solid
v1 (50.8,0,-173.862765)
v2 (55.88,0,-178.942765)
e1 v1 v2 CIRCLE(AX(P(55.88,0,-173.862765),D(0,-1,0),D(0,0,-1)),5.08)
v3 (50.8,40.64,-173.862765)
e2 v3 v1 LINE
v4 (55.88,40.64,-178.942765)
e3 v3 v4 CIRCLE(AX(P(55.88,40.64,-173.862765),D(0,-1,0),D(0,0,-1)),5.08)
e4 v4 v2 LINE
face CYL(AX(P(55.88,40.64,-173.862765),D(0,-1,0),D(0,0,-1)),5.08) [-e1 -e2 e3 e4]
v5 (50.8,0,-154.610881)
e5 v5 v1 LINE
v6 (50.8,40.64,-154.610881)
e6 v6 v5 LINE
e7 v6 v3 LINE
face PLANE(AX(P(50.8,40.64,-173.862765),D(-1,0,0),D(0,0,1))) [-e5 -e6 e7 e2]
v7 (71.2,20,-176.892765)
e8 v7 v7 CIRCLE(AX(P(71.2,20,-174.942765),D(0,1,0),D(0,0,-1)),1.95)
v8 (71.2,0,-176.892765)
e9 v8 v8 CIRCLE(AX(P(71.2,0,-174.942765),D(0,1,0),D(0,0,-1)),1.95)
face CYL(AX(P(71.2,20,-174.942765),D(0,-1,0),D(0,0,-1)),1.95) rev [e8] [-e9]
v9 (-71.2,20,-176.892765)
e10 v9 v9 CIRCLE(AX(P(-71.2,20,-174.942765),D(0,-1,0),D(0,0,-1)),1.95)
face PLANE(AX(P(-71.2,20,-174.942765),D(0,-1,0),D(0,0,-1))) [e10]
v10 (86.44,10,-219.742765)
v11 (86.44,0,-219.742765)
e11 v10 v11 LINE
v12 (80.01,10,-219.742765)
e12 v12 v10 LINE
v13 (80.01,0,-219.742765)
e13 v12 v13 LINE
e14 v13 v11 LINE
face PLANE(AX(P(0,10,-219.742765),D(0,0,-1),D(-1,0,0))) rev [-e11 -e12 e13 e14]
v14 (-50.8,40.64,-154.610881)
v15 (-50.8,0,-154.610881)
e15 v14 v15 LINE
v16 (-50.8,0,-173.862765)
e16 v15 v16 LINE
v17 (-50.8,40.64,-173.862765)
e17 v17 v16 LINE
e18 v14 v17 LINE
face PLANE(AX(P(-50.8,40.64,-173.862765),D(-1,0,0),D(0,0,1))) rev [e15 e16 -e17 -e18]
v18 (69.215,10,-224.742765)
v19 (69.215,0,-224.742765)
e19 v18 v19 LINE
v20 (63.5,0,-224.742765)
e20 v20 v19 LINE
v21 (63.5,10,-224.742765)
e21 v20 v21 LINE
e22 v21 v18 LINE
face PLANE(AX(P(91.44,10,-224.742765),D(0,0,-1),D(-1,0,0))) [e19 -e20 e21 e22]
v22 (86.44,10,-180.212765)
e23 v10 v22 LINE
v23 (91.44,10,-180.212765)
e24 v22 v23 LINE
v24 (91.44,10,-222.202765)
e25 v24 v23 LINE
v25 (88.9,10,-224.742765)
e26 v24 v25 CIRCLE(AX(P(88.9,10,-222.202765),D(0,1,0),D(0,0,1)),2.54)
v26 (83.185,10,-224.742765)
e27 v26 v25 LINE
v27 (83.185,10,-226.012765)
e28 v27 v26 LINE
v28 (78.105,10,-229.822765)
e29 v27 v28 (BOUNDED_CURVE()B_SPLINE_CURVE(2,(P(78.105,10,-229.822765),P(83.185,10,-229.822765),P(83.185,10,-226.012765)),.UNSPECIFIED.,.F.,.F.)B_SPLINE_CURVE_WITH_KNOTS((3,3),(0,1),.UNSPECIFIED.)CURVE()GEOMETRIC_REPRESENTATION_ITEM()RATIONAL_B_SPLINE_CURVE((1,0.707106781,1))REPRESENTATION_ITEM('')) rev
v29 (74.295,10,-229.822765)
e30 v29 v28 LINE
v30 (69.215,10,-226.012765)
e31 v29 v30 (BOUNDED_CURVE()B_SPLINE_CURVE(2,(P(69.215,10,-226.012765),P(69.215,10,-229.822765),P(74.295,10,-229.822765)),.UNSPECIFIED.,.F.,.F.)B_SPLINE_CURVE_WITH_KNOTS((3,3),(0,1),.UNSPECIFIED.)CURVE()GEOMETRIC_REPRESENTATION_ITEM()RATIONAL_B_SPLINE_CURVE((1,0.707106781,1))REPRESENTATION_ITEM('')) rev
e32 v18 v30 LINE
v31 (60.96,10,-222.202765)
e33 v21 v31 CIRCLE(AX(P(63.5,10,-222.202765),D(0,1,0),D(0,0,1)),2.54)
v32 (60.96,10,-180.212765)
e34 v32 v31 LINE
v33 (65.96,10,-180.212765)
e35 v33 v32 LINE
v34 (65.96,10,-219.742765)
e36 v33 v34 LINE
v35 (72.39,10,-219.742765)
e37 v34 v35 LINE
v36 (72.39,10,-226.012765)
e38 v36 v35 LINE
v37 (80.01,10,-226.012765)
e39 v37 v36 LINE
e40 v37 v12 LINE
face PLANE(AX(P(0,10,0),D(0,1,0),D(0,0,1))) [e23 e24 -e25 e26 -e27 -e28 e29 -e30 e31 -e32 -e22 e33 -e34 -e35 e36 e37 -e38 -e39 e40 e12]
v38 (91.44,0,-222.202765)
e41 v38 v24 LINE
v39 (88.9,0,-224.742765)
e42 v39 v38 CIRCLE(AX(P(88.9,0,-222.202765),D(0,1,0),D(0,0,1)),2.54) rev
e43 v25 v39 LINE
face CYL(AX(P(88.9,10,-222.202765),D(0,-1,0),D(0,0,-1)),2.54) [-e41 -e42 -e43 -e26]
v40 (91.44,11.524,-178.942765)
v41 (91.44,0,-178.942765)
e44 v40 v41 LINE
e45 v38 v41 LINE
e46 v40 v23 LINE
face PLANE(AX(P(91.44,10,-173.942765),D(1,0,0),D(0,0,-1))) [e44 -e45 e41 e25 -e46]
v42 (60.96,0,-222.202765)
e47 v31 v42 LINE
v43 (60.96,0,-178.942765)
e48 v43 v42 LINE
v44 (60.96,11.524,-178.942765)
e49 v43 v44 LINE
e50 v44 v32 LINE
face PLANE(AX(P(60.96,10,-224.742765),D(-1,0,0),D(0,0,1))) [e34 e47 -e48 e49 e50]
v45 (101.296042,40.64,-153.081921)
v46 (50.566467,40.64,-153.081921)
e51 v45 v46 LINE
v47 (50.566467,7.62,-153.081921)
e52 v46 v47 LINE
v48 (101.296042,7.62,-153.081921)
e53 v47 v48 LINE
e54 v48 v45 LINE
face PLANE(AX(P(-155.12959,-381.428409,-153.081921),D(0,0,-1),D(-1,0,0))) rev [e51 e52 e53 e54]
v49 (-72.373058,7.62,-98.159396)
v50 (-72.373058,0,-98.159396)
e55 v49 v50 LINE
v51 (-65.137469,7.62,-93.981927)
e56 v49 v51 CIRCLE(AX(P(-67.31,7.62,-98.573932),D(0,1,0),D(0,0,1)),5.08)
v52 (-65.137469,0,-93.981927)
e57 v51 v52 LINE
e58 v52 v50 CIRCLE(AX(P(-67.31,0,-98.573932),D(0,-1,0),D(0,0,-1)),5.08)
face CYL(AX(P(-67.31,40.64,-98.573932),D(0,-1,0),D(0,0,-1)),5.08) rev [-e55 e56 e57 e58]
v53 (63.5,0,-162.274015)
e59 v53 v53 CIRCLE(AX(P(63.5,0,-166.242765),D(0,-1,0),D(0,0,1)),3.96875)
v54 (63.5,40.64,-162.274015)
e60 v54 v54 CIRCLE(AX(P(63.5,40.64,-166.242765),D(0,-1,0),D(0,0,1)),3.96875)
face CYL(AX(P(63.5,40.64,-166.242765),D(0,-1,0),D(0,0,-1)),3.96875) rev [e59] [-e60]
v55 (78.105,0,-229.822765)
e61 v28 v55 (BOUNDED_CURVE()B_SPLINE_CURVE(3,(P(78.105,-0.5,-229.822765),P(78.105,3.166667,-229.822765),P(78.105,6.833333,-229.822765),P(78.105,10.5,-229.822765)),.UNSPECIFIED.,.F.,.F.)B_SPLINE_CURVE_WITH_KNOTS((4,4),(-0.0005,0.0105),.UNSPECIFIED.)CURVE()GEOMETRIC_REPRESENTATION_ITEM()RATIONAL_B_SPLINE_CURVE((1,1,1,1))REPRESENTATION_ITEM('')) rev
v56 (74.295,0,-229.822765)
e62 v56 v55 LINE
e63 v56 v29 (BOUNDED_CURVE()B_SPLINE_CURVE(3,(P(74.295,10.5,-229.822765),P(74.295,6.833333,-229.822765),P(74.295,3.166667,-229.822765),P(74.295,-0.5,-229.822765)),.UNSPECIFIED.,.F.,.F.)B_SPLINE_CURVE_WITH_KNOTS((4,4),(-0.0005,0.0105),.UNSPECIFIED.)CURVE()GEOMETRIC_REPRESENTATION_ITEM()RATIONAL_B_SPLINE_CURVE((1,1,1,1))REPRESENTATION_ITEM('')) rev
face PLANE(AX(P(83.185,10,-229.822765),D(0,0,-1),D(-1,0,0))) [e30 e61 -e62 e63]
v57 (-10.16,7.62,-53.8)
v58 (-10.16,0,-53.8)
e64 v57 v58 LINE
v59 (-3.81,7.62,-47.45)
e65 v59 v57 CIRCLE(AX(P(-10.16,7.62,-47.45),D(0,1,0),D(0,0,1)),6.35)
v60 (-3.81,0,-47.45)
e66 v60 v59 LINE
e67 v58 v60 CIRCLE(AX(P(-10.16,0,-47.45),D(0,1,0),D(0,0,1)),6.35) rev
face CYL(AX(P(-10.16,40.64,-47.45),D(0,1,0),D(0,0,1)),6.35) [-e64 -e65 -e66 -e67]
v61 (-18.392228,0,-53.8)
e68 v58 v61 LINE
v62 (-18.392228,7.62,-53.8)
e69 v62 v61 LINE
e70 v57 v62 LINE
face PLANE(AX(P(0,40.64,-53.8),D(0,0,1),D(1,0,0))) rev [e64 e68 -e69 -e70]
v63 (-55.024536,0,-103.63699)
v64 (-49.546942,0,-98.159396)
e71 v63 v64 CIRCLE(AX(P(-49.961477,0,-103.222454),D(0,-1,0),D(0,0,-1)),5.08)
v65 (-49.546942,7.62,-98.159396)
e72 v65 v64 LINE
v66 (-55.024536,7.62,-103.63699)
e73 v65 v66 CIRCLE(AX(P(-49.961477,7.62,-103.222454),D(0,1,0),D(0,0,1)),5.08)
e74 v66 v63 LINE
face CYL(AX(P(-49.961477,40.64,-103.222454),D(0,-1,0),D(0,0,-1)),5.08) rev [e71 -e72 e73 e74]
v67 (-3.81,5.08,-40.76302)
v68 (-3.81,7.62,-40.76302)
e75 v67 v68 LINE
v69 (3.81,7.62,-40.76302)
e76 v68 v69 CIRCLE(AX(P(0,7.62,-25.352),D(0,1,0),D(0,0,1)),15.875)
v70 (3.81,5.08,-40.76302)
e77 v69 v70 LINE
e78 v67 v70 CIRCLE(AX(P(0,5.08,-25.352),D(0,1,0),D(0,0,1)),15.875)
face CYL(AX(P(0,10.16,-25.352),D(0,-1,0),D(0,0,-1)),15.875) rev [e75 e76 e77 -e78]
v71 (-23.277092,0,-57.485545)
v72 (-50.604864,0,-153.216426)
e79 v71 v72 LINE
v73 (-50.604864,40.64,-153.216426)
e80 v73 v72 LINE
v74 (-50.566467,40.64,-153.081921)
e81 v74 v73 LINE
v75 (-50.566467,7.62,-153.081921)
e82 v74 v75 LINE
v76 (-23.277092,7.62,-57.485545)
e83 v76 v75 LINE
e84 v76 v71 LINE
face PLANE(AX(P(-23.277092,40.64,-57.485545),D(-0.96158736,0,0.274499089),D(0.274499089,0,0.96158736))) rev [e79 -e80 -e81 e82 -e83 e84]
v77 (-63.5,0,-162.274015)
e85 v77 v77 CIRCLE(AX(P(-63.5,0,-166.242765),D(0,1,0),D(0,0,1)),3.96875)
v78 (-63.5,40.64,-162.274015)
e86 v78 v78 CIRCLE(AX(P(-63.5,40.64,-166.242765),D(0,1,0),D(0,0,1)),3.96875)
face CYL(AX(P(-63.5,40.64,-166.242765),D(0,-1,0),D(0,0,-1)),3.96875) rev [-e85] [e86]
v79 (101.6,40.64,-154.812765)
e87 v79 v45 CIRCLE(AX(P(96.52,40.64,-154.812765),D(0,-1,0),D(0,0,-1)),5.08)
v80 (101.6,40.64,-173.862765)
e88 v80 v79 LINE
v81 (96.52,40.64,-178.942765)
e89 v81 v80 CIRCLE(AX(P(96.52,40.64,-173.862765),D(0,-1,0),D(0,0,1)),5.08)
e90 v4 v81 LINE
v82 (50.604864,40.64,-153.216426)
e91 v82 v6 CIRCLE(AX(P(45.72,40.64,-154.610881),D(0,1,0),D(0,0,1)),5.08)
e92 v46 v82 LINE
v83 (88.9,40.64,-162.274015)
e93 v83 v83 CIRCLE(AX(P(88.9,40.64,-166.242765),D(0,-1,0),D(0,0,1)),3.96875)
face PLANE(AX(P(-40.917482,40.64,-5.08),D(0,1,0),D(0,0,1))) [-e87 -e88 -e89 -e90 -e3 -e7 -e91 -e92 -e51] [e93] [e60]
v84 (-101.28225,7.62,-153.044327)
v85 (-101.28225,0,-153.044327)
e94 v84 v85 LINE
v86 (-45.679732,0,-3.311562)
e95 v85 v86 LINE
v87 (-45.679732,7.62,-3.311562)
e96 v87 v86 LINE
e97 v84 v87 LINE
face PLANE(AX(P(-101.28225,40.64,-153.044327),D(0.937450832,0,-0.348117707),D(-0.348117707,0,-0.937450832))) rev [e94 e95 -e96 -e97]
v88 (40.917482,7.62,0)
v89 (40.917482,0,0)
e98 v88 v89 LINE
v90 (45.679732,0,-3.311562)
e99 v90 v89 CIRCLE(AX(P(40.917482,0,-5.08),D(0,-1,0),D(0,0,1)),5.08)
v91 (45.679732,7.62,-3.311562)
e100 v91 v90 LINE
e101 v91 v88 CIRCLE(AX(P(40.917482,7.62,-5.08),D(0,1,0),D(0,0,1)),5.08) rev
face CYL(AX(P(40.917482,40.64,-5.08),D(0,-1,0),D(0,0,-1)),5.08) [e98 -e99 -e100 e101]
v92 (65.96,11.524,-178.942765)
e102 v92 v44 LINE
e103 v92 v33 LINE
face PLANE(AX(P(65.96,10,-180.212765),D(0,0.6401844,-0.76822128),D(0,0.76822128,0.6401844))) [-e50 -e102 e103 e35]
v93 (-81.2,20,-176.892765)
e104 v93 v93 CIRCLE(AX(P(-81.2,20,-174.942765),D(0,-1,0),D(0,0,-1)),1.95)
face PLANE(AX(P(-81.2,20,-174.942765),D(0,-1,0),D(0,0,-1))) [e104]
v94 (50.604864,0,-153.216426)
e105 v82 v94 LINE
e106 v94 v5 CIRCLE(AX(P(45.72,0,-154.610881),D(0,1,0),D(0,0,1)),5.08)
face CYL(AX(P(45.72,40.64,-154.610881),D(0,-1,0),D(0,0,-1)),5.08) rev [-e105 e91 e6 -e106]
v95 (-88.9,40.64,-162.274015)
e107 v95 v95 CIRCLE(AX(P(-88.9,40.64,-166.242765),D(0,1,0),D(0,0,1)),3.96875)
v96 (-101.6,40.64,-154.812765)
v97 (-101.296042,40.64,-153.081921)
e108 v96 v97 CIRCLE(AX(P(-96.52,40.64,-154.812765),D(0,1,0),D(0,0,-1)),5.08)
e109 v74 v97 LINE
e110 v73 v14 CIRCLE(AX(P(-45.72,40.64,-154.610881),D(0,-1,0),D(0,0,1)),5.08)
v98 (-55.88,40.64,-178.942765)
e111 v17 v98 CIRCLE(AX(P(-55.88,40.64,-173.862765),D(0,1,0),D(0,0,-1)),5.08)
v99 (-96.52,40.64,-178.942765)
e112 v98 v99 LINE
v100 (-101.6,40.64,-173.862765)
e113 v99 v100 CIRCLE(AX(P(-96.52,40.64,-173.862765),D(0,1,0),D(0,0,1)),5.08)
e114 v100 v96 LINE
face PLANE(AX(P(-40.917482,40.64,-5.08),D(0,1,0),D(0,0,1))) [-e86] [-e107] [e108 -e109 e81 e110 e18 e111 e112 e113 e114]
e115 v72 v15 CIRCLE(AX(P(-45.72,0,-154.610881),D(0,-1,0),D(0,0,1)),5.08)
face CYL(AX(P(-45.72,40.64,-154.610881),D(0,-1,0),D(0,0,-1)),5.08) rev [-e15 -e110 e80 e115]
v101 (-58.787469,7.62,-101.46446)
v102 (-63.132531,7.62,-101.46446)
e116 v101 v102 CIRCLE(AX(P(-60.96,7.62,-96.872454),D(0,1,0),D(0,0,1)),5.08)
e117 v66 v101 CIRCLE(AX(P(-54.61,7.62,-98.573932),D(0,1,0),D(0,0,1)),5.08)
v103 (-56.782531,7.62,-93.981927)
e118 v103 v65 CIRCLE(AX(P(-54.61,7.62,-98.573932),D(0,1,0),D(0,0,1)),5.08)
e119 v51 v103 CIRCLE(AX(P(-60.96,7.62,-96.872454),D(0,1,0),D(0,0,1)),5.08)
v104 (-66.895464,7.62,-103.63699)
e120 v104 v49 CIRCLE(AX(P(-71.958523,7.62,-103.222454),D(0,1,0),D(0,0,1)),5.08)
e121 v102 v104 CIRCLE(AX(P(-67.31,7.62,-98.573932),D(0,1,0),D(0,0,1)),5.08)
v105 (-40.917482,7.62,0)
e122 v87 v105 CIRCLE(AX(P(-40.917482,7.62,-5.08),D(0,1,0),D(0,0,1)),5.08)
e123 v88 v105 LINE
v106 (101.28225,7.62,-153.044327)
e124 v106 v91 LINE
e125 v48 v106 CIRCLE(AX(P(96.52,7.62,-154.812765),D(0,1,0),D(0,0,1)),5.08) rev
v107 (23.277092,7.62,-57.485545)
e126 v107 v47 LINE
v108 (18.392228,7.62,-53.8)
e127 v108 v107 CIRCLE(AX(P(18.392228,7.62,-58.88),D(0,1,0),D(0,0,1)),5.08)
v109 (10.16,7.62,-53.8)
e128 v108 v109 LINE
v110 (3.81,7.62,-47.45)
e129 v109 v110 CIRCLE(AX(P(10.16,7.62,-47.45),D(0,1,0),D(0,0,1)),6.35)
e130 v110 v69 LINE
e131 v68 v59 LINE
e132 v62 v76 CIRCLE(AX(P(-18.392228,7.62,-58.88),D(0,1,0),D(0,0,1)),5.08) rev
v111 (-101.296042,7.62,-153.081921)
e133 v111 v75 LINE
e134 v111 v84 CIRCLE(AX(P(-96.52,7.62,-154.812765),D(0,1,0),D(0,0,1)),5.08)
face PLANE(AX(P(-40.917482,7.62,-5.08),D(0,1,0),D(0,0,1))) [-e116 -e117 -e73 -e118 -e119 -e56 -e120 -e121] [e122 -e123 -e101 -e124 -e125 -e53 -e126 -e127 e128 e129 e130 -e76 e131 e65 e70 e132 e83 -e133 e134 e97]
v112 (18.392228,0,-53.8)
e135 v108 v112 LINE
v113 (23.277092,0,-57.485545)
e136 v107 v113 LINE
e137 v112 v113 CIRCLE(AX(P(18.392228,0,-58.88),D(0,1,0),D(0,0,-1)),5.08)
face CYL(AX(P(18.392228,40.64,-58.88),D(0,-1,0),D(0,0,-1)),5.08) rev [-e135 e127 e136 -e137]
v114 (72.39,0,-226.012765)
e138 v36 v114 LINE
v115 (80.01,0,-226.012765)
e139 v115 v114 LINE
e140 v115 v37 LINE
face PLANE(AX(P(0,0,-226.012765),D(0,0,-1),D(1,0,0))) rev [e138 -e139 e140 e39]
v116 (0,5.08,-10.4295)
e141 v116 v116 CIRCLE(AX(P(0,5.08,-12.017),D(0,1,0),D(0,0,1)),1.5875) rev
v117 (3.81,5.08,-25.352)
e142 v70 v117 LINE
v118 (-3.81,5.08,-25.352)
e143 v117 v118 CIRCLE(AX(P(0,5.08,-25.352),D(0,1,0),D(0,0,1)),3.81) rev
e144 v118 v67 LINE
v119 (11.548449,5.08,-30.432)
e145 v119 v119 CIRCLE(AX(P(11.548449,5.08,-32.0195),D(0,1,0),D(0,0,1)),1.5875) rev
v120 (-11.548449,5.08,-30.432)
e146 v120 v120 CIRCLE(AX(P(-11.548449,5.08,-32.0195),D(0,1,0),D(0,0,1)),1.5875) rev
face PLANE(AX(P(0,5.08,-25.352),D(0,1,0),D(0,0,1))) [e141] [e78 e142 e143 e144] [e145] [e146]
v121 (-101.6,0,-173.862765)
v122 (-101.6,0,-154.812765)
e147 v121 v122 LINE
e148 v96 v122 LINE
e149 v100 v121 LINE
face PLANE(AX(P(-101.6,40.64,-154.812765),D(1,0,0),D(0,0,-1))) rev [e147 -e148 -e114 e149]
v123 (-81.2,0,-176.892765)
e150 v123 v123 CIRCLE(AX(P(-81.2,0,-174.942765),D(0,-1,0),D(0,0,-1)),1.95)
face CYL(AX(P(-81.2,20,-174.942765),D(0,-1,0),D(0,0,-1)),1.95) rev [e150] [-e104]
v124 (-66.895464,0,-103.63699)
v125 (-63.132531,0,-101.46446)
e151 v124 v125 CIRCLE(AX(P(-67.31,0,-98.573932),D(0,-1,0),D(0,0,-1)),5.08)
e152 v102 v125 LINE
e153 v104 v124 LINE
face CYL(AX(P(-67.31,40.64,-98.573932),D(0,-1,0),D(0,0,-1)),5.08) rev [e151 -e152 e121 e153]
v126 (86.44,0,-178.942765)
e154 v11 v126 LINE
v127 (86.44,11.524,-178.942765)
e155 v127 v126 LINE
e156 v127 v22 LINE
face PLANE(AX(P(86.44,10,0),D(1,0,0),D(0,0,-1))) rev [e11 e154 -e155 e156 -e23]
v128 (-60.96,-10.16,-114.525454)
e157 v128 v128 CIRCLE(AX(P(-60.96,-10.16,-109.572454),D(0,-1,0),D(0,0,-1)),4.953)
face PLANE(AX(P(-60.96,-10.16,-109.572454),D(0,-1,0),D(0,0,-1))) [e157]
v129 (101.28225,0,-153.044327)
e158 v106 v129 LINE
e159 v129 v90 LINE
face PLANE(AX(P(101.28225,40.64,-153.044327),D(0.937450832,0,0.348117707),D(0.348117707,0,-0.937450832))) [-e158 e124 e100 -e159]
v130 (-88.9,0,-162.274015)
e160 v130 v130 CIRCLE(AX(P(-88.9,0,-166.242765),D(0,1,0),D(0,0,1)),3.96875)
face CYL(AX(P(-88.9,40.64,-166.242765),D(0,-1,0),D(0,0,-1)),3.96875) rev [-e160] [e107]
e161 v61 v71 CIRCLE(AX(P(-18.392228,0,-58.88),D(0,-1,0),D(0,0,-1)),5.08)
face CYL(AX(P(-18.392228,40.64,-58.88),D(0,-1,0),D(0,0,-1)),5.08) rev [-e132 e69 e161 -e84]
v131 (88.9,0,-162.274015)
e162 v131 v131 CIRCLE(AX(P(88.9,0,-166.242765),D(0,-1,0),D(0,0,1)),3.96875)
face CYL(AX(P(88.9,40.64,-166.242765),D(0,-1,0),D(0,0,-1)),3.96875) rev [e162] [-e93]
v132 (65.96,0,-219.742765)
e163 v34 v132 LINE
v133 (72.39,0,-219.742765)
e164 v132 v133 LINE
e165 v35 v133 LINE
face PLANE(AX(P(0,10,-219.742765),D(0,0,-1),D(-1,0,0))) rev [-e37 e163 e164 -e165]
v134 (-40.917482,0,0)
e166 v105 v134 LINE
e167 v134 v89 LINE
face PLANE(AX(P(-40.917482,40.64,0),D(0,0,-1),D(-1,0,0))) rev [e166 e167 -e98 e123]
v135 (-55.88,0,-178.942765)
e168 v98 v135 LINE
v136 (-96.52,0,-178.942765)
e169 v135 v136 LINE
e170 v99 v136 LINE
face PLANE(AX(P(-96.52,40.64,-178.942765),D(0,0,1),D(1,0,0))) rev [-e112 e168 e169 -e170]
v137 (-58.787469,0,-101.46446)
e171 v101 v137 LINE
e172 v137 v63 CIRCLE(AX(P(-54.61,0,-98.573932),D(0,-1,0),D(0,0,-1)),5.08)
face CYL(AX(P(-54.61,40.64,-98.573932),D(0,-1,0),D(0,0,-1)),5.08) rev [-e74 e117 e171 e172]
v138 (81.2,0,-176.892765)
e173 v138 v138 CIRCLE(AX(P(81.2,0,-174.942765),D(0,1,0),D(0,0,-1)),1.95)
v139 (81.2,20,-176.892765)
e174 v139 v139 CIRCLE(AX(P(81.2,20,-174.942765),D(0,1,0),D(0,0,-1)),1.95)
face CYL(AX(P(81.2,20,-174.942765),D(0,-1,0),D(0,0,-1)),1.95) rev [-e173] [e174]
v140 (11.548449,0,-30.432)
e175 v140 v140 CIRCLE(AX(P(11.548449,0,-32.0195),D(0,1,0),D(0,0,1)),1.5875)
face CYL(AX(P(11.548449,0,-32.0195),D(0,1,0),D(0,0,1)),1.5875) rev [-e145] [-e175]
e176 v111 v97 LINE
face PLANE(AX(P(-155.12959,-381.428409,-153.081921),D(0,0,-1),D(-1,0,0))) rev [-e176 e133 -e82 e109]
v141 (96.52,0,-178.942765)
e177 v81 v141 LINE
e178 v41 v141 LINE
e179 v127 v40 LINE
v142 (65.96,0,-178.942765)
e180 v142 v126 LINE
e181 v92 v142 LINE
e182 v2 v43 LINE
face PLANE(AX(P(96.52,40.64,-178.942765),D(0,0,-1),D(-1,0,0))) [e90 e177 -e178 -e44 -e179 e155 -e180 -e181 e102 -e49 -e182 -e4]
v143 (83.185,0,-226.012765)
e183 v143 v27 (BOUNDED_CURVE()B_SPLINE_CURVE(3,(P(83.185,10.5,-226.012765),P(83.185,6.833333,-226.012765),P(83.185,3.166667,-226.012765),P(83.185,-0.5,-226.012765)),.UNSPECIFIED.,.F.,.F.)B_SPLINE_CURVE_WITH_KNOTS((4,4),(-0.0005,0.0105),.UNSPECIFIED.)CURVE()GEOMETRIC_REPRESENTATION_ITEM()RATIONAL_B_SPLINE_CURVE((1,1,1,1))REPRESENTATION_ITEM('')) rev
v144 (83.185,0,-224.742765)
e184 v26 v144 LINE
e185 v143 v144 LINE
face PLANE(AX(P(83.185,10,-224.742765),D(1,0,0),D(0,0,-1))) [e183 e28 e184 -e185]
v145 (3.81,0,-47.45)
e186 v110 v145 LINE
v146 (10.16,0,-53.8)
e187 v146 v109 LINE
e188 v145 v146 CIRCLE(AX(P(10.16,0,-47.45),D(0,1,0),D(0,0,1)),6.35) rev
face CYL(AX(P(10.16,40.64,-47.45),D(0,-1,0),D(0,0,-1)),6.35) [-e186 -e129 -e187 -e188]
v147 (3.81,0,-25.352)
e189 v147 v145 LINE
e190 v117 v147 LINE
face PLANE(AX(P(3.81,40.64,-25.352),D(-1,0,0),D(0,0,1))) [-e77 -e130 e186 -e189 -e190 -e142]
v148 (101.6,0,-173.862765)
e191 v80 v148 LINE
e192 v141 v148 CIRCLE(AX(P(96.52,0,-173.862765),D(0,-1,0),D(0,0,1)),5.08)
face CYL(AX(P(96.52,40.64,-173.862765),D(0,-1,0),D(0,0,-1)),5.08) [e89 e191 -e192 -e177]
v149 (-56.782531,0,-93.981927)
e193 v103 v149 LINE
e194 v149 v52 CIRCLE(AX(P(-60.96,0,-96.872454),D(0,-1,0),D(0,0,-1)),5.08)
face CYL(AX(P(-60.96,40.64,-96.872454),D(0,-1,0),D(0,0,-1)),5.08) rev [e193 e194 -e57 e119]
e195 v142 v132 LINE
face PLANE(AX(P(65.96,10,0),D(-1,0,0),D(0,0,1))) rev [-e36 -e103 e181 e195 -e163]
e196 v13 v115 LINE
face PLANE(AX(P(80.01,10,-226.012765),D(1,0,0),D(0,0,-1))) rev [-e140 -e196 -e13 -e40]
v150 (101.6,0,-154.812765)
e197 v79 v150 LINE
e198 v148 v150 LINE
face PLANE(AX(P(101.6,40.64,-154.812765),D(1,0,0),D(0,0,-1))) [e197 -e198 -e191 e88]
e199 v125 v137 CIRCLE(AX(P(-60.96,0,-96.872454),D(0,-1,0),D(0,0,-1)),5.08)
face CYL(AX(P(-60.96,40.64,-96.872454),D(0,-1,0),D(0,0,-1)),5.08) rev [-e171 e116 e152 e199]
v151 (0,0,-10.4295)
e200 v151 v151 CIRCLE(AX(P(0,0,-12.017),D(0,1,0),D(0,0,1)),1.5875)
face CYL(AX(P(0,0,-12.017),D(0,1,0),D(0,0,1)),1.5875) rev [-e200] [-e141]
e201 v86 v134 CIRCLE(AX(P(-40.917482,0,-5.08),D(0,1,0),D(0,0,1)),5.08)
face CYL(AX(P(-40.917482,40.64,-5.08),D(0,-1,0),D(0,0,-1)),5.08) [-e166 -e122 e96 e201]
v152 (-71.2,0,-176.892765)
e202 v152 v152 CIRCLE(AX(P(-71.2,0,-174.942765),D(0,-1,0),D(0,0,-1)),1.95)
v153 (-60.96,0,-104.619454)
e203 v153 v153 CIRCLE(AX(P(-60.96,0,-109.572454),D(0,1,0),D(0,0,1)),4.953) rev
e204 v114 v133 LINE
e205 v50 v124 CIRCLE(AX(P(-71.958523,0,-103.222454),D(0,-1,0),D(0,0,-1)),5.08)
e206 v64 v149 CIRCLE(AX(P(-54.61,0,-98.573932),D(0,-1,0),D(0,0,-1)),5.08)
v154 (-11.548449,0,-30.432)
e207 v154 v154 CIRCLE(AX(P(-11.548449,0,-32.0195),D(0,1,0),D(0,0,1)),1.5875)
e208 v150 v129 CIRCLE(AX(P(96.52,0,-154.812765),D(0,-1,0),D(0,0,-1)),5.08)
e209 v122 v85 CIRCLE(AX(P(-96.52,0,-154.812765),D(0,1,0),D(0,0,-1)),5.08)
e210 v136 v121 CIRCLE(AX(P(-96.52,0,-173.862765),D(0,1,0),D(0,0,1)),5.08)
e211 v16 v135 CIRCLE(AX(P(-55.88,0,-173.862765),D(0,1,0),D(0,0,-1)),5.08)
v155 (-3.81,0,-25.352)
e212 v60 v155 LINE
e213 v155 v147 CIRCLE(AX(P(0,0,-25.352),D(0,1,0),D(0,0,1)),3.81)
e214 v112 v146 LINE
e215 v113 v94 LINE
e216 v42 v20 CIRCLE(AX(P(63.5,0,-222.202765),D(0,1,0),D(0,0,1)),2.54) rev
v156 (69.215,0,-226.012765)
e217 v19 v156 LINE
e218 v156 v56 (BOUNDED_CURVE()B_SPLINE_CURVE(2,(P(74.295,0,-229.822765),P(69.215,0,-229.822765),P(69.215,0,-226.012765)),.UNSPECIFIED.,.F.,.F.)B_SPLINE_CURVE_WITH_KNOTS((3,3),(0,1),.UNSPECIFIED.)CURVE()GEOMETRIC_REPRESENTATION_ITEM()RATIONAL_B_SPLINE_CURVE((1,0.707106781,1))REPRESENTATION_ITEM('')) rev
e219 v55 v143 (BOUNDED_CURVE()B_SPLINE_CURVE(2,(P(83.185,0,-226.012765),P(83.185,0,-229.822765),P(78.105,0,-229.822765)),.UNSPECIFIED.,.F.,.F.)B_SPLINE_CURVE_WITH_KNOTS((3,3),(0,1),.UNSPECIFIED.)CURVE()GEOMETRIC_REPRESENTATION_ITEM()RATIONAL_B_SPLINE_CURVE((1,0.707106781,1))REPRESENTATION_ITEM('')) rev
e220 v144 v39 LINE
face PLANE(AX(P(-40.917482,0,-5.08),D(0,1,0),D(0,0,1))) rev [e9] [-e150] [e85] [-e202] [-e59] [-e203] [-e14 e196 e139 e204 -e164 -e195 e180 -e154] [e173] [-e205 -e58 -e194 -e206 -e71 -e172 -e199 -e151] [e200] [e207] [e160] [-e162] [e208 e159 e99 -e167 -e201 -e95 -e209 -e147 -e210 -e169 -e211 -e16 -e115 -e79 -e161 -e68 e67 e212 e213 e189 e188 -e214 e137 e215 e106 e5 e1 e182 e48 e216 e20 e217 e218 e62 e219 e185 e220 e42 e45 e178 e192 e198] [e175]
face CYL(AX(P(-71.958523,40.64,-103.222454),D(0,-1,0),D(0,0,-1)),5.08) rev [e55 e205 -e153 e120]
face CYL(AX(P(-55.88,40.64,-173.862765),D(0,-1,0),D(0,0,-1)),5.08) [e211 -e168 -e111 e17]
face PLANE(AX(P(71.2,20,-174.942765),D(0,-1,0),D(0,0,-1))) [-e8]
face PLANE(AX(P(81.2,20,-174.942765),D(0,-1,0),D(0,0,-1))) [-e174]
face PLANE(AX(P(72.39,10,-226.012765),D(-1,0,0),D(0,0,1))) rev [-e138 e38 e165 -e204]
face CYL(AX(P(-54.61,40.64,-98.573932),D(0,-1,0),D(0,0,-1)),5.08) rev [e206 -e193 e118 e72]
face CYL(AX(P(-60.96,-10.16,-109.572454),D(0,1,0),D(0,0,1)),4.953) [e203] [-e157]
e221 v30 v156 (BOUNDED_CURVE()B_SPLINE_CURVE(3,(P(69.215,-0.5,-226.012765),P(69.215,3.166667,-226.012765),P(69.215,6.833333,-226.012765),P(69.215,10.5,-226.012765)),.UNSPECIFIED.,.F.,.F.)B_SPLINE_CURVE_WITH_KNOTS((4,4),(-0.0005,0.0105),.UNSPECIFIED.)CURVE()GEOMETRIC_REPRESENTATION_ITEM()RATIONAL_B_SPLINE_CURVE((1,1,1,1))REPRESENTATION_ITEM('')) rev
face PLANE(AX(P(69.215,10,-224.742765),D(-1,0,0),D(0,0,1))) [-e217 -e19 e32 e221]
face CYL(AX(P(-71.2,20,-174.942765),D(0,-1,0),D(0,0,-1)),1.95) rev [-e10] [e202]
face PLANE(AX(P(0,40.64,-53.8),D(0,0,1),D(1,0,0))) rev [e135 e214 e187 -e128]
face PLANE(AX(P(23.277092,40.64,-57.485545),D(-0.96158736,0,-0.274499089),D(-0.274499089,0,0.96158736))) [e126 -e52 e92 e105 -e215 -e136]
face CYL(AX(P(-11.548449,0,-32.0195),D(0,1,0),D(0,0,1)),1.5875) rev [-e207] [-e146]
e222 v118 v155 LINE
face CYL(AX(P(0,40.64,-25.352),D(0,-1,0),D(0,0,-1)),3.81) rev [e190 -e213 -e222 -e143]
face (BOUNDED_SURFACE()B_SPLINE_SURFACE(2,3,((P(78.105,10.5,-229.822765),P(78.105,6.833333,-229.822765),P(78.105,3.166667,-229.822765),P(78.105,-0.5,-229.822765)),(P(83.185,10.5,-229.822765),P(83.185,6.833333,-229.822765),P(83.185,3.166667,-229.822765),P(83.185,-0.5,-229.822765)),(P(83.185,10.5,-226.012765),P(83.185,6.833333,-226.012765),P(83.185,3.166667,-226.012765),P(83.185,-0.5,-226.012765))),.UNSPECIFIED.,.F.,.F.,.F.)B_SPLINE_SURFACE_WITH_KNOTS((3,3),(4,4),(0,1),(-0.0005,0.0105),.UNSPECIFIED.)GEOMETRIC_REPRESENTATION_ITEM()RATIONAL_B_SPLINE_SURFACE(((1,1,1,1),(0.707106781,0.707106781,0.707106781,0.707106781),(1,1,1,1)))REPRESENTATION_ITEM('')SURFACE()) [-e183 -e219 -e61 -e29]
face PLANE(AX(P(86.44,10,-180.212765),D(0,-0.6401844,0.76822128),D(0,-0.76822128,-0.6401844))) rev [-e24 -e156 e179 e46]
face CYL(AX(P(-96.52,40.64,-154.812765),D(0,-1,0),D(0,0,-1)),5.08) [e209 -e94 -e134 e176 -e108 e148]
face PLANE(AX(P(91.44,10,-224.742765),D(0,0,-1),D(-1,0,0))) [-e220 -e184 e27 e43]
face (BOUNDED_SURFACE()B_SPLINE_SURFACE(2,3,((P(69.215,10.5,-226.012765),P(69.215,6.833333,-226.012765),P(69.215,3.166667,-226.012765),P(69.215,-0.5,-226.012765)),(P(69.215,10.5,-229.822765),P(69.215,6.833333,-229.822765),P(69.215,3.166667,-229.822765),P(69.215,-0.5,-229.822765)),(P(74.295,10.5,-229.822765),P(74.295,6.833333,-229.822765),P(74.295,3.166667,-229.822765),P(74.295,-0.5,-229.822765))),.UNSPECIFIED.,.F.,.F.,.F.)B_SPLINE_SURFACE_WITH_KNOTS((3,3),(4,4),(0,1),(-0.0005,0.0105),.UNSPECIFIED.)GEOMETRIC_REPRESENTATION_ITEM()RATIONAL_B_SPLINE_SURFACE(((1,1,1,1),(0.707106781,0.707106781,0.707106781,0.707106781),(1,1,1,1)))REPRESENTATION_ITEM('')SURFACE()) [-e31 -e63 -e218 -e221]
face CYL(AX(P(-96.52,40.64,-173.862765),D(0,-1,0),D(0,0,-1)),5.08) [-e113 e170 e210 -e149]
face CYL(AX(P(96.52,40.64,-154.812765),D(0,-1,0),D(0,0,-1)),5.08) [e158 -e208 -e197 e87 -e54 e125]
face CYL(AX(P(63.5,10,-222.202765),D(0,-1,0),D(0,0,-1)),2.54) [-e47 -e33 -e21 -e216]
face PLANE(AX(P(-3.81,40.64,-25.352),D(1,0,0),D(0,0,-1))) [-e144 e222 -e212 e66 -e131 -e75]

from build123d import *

# Parameters (mm, degrees)
SKETCH1_R            = 3.96875
BOSS_EXTRUDE2_DEPTH  = 40.64
SKETCH4_R            = 1.5875
CUT_EXTRUDE1_DEPTH   = 210.749095026
CUT_EXTRUDE2_START   = 5.08
SKETCH5_R            = 15.875
CUT_EXTRUDE2_DEPTH   = 5.08
SKETCH7_W            = 321.437634852
SKETCH7_H            = 153.081921076
CUT_EXTRUDE3_DEPTH   = 33.02
CUT_EXTRUDE5_DEPTH   = 210.749095026
FILLET1_R            = 6.35
FILLET2_R            = 6.35
EXTRUDE_THIN1_DEPTH  = 10
SKETCH14_R           = 1.950000064
CUT_EXTRUDE6_DEPTH   = 20
BOSS_EXTRUDE4_DEPTH  = 5
MIRROR5_COPY_1_DEPTH = 5
FILLET3_R            = 2.54
SKETCH20_W           = 13.97
SKETCH20_H           = 5.08
BOSS_EXTRUDE5_DEPTH  = 10
FILLET7_SIZE         = 3.81
FILLET7_SIZE_2       = 5.08
FILLET6_SIZE         = 3.81
FILLET6_SIZE_2       = 5.08
CUT_EXTRUDE10_START  = -5
SKETCH19_W           = 7.62
SKETCH19_H           = 10.16
CUT_EXTRUDE10_DEPTH  = 6.27
MIRROR6_OUTLINE_W    = 7.62
MIRROR6_OUTLINE_H    = 5
MIRROR6_DEPTH        = 10
MIRROR6_2_DEPTH      = 10
SKETCH21_W           = 77.087164644
SKETCH21_H           = 69.073945867
CUT_EXTRUDE11_DEPTH  = 210.74909516
SKETCH22_R           = 4.953
BOSS_EXTRUDE6_DEPTH  = 10.16
SKETCH23_R           = 5.08
CUT_EXTRUDE12_DEPTH  = 255.54404949


# Read off the part's stored shape, not the designer's step: Mirror6
with BuildPart() as part:
    # Sketch1 → Boss-Extrude2 (new body)
    with BuildSketch(Plane(origin=(0, 0, 0), x_dir=(1, 0, 0), z_dir=(0, 1, 0))):
        with BuildLine():
            Line((-96.52, 178.942765331), (-55.88, 178.942765331))
            ThreePointArc((-55.88, 178.942765331), (-52.287897552, 177.454867779), (-50.8, 173.862765331))
            Line((-50.8, 173.862765331), (-50.8, 154.610881096))
            ThreePointArc((-50.8, 154.610881096), (-50.750979429, 153.906859803), (-50.604863787, 153.216425724))
            Line((-50.604863787, 153.216425724), (-23.277092285, 57.485544628))
            ThreePointArc((-23.277092285, 57.485544628), (-21.451849938, 54.824742099), (-18.392228498, 53.8))
            Line((-18.392228498, 53.8), (0, 53.8))
            Line((0, 53.8), (0, 0))
            Line((0, 0), (-40.91748188, 0))
            ThreePointArc((-40.91748188, 0), (-43.817717665, 0.909264766), (-45.679732106, 3.31156205))
            Line((-45.679732106, 3.31156205), (-101.282250226, 153.044327381))
            ThreePointArc((-101.282250226, 153.044327381), (-101.519931557, 153.914386555), (-101.6, 154.812765331))
            Line((-101.6, 154.812765331), (-101.6, 173.862765331))
            ThreePointArc((-101.6, 173.862765331), (-100.112102448, 177.454867779), (-96.52, 178.942765331))
        make_face()
        with Locations(Location((-88.9, 166.242765331, 0), (0, 0, 270))):
            Circle(SKETCH1_R, mode=Mode.SUBTRACT)
        with Locations(Location((-63.5, 166.242765331, 0), (0, 0, 270))):
            Circle(SKETCH1_R, mode=Mode.SUBTRACT)
    boss_extrude2 = extrude(amount=BOSS_EXTRUDE2_DEPTH)

    # Mirror1: Boss-Extrude2 across plane
    add(boss_extrude2.mirror(Plane(origin=(0, 40.64, -53.8), x_dir=(0, 0, 1), z_dir=(-1, 0, 0))))

    # Sketch4 → Cut-Extrude1 (cut, through all)
    with BuildSketch(Plane(origin=(0, 40.64, 0), x_dir=(1, 0, 0), z_dir=(0, 1, 0))):
        with Locations(Location((11.548448759, 32.0195, 0), (0, 0, 270))):
            Circle(SKETCH4_R)
        with Locations(Location((0, 12.017, 0), (0, 0, 270))):
            Circle(SKETCH4_R)
        with Locations(Location((-11.548448759, 32.0195, 0), (0, 0, 270))):
            Circle(SKETCH4_R)
    extrude(amount=-CUT_EXTRUDE1_DEPTH, mode=Mode.SUBTRACT)

    # Sketch5 → Cut-Extrude2 (cut)
    with BuildSketch(Plane(origin=(0, 0, 0), x_dir=(1, 0, 0), z_dir=(0, 1, 0)).offset(CUT_EXTRUDE2_START)):
        with Locations(Location((0, 25.352, 0), (0, 0, 270))):
            Circle(SKETCH5_R)
    extrude(amount=CUT_EXTRUDE2_DEPTH, mode=Mode.SUBTRACT)

    # Sketch7 → Cut-Extrude3 (cut)
    with BuildSketch(Plane(origin=(0, 40.64, 0), x_dir=(1, 0, 0), z_dir=(0, 1, 0))):
        with Locations((5.589227859, 76.540960538)):
            Rectangle(SKETCH7_W, SKETCH7_H)
    extrude(amount=-CUT_EXTRUDE3_DEPTH, mode=Mode.SUBTRACT)

    # Sketch8 → Cut-Extrude5 (cut, through all)
    with BuildSketch(Plane(origin=(0, 0, 0), x_dir=(1, 0, 0), z_dir=(0, 1, 0))):
        with BuildLine():
            Line((-3.81, 25.352), (-3.81, 53.8))
            ThreePointArc((-3.81, 53.8), (0, 57.61), (3.81, 53.8))
            Line((3.81, 53.8), (3.81, 25.352))
            ThreePointArc((3.81, 25.352), (0, 21.542), (-3.81, 25.352))
        make_face()
    extrude(amount=CUT_EXTRUDE5_DEPTH, mode=Mode.SUBTRACT)

    # Fillet1
    fillet1_edges = [part.edges().sort_by_distance(p)[0] for p in [
        (-3.81, 3.81, -53.8),
    ]]
    fillet(fillet1_edges, radius=FILLET1_R)

    # Fillet2
    fillet2_edges = [part.edges().sort_by_distance(p)[0] for p in [
        (3.81, 3.81, -53.8),
    ]]
    fillet(fillet2_edges, radius=FILLET2_R)

    # Sketch9 → Extrude-Thin1 (add)
    with BuildSketch(Plane(origin=(0, 0, 0), x_dir=(1, 0, 0), z_dir=(0, 1, 0))):
        Polygon((-91.44, 173.942765331), (-91.44, 224.742765331), (-60.96, 224.742765331), (-60.96, 173.942765331), (-65.96, 173.942765331), (-65.96, 219.742765331), (-86.44, 219.742765331), (-86.44, 173.942765331), align=None)
    extrude_thin1 = extrude(amount=EXTRUDE_THIN1_DEPTH)

    # Sketch14 → Cut-Extrude6 (cut)
    with BuildSketch(Plane.XZ):
        with Locations(Location((-81.2, -174.942765331, 0), (0, 0, 270))):
            Circle(SKETCH14_R)
        with Locations(Location((-71.2, -174.942765331, 0), (0, 0, 270))):
            Circle(SKETCH14_R)
    cut_extrude6 = extrude(amount=-CUT_EXTRUDE6_DEPTH, mode=Mode.SUBTRACT)

    # Sketch18 → Boss-Extrude4 (add)
    with BuildSketch(Plane(origin=(-60.96, 10, -178.942765331), x_dir=(0, 0, 1), z_dir=(-1, 0, 0))):
        Polygon((-1.27, 0), (0, 1.524), (0, 0), align=None)
    boss_extrude4 = extrude(amount=BOSS_EXTRUDE4_DEPTH)

    # Mirror3: Boss-Extrude4 across plane
    add(boss_extrude4.mirror(Plane(origin=(-76.2, 0, 0), x_dir=(0, 0, 1), z_dir=(1, 0, 0))))

    # Mirror5: Extrude-Thin1, Cut-Extrude6, Boss-Extrude4 across plane
    add(extrude_thin1.mirror(Plane(origin=(0, 0, 0), x_dir=(0, 0, 1), z_dir=(1, 0, 0))))
    add(cut_extrude6.mirror(Plane(origin=(0, 0, 0), x_dir=(0, 0, 1), z_dir=(1, 0, 0))), mode=Mode.SUBTRACT)
    add(boss_extrude4.mirror(Plane(origin=(0, 0, 0), x_dir=(0, 0, 1), z_dir=(1, 0, 0))))

    # Mirror5 copy 1 sketch → Mirror5 copy 1 (add)
    with BuildSketch(Plane(origin=(91.44, 10, -178.942765331), x_dir=(0, 0, 1), z_dir=(-1, 0, 0))):
        Polygon((-1.27, 0), (0, 1.524), (0, 0), align=None)
    extrude(amount=MIRROR5_COPY_1_DEPTH)

    # Fillet3
    fillet3_edges = [part.edges().sort_by_distance(p)[0] for p in [
        (-91.44, 5, -224.742765331),
        (-60.96, 5, -224.742765331),
        (91.44, 5, -224.742765331),
        (60.96, 5, -224.742765331),
    ]]
    fillet(fillet3_edges, radius=FILLET3_R)

    # Sketch20 → Boss-Extrude5 (add)
    with BuildSketch(Plane(origin=(0, 0, 0), x_dir=(1, 0, 0), z_dir=(0, 1, 0))):
        with Locations((-76.2, 227.282765331)):
            Rectangle(SKETCH20_W, SKETCH20_H)
    extrude(amount=BOSS_EXTRUDE5_DEPTH)

    # Fillet7
    # an asymmetric fillet: 5.08, 3.81 mm, written as the material it takes off along each edge
    with BuildSketch(Plane(origin=(-83.185, -12.7, -229.822765331), x_dir=(0, 0, 1), z_dir=(0, 1, 0))) as fillet7_piece_1:
        with BuildLine():
            Bezier((FILLET7_SIZE, 0), (0, 0), (0, FILLET7_SIZE_2), weights=[1, 0.707106781, 1])
            Line((0, FILLET7_SIZE_2), (0, 0))
            Line((0, 0), (FILLET7_SIZE, 0))
        make_face()
    extrude(amount=35.4, mode=Mode.SUBTRACT)

    # Fillet6
    # an asymmetric fillet: 5.08, 3.81 mm, written as the material it takes off along each edge
    with BuildSketch(Plane(origin=(-69.215, -12.7, -229.822765331), x_dir=(0, 0, 1), z_dir=(0, 1, 0))) as fillet6_piece_1:
        with BuildLine():
            Bezier((FILLET6_SIZE, 0), (0, 0), (0, -FILLET6_SIZE_2), weights=[1, 0.707106781, 1])
            Line((0, -FILLET6_SIZE_2), (0, 0))
            Line((0, 0), (FILLET6_SIZE, 0))
        make_face()
    extrude(amount=35.4, mode=Mode.SUBTRACT)

    # Sketch19 → Cut-Extrude10 (cut)
    with BuildSketch(Plane(origin=(0, 0, -224.742765331), x_dir=(-1, 0, 0), z_dir=(0, 0, -1)).offset(CUT_EXTRUDE10_START)):
        with Locations((76.2, 4.92)):
            Rectangle(SKETCH19_W, SKETCH19_H)
    extrude(amount=CUT_EXTRUDE10_DEPTH, mode=Mode.SUBTRACT)

    # Mirror6 outline → Mirror6 (cut)
    with BuildSketch(Plane(origin=(0, 0, 0), x_dir=(1, 0, 0), z_dir=(0, 1, 0))):
        with Locations((76.2, 222.242765331)):
            Rectangle(MIRROR6_OUTLINE_W, MIRROR6_OUTLINE_H)
    extrude(amount=MIRROR6_DEPTH, mode=Mode.SUBTRACT)

    # Mirror6 2 outline → Mirror6 2 (add)
    with BuildSketch(Plane(origin=(0, 0, 0), x_dir=(1, 0, 0), z_dir=(0, 1, 0))):
        with BuildLine():
            add(Edge.make_bspline(
                [(78.105, 229.822765331), (83.185, 229.822765331), (83.185, 226.012765331)],
                knots=[0, 0, 0, 1, 1, 1], degree=2, weights=[1, 0.707106781, 1]))
            Line((78.105, 229.822765331), (74.295, 229.822765331))
            add(Edge.make_bspline(
                [(69.215, 226.012765331), (69.215, 229.822765331), (74.295, 229.822765331)],
                knots=[0, 0, 0, 1, 1, 1], degree=2, weights=[1, 0.707106781, 1]))
            Line((69.215, 226.012765331), (69.215, 224.742765331))
            Line((69.215, 224.742765331), (72.39, 224.742765331))
            Line((72.39, 224.742765331), (72.39, 226.012765331))
            Line((72.39, 226.012765331), (80.01, 226.012765331))
            Line((80.01, 226.012765331), (80.01, 224.742765331))
            Line((80.01, 224.742765331), (83.185, 224.742765331))
            Line((83.185, 224.742765331), (83.185, 226.012765331))
        make_face()
    extrude(amount=MIRROR6_2_DEPTH)

    # Sketch21 → Cut-Extrude11 (cut, through all)
    with BuildSketch(Plane(origin=(0, 0, -178.942765331), x_dir=(-1, 0, 0), z_dir=(0, 0, -1))):
        with Locations((78.752430528, 22.788762469)):
            Rectangle(SKETCH21_W, SKETCH21_H)
    extrude(amount=CUT_EXTRUDE11_DEPTH, mode=Mode.SUBTRACT)

    # Sketch22 → Boss-Extrude6 (add)
    with BuildSketch(Plane.XZ):
        with Locations(Location((-60.96, -109.572454465, 0), (0, 0, 90))):
            Circle(SKETCH22_R)
    extrude(amount=BOSS_EXTRUDE6_DEPTH)

    # Sketch23 → Cut-Extrude12 (cut, through all)
    with BuildSketch(Plane.XZ):
        with Locations((-67.31, -98.573931837)):
            Circle(SKETCH23_R)
        with Locations((-71.958522628, -103.222454465)):
            Circle(SKETCH23_R)
        with Locations((-60.96, -96.872454465)):
            Circle(SKETCH23_R)
        with Locations((-54.61, -98.573931837)):
            Circle(SKETCH23_R)
        with Locations((-49.961477372, -103.222454465)):
            Circle(SKETCH23_R)
    extrude(amount=-CUT_EXTRUDE12_DEPTH, mode=Mode.SUBTRACT)


solid = part.part
